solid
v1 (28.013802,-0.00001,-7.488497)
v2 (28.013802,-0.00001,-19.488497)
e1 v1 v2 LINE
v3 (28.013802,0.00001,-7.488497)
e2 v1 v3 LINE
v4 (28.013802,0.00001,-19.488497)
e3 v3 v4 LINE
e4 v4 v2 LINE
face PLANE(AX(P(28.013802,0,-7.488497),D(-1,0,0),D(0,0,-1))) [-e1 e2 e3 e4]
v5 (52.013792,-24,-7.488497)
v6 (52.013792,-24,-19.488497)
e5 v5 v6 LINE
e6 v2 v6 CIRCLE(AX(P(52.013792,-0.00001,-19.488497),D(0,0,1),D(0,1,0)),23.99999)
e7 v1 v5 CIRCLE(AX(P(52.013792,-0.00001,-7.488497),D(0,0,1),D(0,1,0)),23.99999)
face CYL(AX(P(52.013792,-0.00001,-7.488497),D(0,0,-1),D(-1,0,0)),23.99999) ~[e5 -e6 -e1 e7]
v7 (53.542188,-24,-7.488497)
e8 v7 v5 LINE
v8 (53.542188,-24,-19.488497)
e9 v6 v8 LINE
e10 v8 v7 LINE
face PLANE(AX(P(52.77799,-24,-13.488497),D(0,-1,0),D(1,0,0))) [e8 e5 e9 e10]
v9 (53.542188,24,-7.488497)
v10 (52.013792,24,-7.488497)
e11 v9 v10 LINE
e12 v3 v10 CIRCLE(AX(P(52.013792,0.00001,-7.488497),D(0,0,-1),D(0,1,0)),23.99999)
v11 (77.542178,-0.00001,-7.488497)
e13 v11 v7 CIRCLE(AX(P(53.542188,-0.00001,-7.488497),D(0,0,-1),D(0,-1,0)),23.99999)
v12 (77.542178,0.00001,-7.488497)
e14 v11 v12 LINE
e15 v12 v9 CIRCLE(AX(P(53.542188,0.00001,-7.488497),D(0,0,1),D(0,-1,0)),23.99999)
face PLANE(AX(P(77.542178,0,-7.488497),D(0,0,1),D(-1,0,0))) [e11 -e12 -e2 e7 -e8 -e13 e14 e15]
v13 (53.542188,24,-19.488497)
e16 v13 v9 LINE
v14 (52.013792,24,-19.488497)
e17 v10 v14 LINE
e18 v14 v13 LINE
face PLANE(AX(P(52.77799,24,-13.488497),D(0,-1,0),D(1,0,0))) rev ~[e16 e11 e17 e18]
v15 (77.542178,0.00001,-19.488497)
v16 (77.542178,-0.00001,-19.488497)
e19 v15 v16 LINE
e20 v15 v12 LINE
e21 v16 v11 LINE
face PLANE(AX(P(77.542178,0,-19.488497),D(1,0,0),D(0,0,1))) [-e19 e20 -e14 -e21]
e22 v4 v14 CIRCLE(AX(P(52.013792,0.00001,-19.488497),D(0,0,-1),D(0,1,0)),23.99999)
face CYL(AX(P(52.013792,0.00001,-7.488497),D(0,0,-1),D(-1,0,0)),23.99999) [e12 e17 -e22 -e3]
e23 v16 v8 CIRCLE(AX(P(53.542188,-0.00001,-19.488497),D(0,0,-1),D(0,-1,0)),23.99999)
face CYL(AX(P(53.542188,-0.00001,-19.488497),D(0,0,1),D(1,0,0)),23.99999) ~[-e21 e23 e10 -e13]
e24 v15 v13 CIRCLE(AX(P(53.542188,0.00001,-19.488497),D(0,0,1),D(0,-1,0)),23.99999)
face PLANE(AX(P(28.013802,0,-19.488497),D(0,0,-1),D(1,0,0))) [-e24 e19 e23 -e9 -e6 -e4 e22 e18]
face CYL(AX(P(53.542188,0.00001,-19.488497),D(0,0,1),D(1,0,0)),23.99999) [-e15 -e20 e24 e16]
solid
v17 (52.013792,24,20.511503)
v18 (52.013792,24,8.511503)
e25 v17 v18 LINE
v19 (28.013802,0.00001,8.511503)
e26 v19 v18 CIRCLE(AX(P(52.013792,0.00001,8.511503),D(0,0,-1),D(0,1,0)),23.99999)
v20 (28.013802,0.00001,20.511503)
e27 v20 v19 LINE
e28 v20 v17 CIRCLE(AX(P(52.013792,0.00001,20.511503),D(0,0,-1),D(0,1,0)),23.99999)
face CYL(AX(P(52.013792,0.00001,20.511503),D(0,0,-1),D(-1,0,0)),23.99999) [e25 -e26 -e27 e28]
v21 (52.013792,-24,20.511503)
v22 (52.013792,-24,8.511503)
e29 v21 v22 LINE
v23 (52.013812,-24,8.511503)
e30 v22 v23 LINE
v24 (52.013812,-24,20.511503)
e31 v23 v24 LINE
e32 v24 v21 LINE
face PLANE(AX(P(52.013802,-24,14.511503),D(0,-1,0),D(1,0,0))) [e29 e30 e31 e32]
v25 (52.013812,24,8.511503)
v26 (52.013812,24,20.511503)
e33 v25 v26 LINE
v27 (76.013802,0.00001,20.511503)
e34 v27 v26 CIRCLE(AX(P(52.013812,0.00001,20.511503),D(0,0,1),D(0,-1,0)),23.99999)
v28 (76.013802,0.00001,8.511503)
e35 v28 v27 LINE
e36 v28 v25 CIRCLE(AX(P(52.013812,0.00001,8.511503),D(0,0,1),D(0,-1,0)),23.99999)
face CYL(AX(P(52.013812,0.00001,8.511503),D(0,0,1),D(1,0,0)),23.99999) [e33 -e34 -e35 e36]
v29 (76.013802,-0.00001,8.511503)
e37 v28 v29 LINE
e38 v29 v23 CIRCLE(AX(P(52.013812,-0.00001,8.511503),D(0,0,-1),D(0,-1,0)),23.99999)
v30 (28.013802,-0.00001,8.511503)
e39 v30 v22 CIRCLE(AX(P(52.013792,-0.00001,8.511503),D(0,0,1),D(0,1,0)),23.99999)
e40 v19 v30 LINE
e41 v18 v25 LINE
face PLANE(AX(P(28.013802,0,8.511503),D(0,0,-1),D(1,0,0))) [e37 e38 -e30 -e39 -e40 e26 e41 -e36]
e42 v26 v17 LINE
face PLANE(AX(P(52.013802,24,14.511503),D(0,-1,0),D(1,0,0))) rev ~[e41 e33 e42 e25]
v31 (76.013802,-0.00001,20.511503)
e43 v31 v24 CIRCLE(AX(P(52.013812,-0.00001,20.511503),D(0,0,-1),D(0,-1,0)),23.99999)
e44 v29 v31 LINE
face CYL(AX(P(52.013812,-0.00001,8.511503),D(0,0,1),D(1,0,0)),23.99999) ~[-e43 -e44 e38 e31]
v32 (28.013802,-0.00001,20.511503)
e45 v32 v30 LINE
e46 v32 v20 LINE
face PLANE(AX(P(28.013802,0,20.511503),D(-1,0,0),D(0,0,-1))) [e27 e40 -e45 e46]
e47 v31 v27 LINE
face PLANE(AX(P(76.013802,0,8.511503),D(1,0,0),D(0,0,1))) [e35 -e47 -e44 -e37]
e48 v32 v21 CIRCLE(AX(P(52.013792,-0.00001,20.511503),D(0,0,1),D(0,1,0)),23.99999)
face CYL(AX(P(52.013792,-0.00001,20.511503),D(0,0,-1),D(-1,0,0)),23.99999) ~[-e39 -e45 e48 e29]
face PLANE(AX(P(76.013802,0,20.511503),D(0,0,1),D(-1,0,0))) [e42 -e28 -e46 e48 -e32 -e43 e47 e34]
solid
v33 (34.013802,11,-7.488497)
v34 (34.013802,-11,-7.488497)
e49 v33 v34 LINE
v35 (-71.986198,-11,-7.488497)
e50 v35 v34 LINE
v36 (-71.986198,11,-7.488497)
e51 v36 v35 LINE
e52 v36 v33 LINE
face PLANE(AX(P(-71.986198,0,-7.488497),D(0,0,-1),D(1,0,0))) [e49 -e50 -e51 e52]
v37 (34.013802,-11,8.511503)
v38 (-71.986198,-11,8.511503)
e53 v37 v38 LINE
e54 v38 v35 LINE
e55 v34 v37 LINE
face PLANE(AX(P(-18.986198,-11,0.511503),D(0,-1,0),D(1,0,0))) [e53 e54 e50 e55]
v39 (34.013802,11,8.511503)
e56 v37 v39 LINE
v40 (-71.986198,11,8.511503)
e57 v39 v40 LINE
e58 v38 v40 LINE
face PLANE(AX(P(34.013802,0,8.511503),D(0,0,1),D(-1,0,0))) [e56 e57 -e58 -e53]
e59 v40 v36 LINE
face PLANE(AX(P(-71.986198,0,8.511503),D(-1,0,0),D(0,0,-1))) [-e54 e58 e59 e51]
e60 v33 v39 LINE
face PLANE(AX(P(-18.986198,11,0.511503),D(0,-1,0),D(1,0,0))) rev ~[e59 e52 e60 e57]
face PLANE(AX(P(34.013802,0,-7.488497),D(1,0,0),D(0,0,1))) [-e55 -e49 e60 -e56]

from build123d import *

# Parameters (mm, degrees)
F1_DEPTH = 24
F2_DEPTH = 11
F3_R     = 23.99999
F3_2_R   = 23.99999


# Not quite as in the source:
# - a fillet or chamfer is up to 0.001 mm smaller than in the source, because OpenCascade refuses the exact size


with BuildPart() as f1:
    # F0 (on Front) → F1 (new body, symmetric)
    with BuildSketch(Plane.XZ):
        Polygon((28.0138015747, 20.5115029328), (28.0138015747, 8.5115029328), (34.0138015747, 8.5115029328), (76.0138015747, 8.5115029328), (76.0138015747, 20.5115029328), align=None)
    extrude(amount=F1_DEPTH, both=True)

    # F3 (radius 24 in the source; OpenCascade refuses exactly that, so slightly less here)
    f3_edges = [f1.edges().sort_by_distance(p)[0] for p in [
        (76.013802, -24, 14.511503),
        (76.013802, 24, 14.511503),
        (28.013802, -24, 14.511503),
        (28.013802, 24, 14.511503),
    ]]
    fillet(f3_edges, radius=F3_R)


with BuildPart() as f1b:
    # F0 (on Front) → F1, piece 2 (new body, symmetric)
    with BuildSketch(Plane.XZ):
        Polygon((34.0138015747, -7.4884970672), (28.0138015747, -7.4884970672), (28.0138015747, -19.4884970672), (77.5421783328, -19.4884970672), (77.5421783328, -7.4884970672), align=None)
    extrude(amount=F1_DEPTH, both=True)

    # F3#2 (radius 24 in the source; OpenCascade refuses exactly that, so slightly less here)
    f3_2_edges = [f1b.edges().sort_by_distance(p)[0] for p in [
        (77.542178, 24, -13.488497),
        (77.542178, -24, -13.488497),
        (28.013802, -24, -13.488497),
        (28.013802, 24, -13.488497),
    ]]
    fillet(f3_2_edges, radius=F3_2_R)


with BuildPart() as f2:
    # F0 (on Front) → F2 (new body, symmetric)
    with BuildSketch(Plane.XZ):
        Polygon((28.0138015747, 8.5115029328), (-71.9861984253, 8.5115029328), (-71.9861984253, -7.4884970672), (28.0138015747, -7.4884970672), (34.0138015747, -7.4884970672), (34.0138015747, 8.5115029328), align=None)
    extrude(amount=F2_DEPTH, both=True)


solid = Compound([f1.part, f1b.part, f2.part])
